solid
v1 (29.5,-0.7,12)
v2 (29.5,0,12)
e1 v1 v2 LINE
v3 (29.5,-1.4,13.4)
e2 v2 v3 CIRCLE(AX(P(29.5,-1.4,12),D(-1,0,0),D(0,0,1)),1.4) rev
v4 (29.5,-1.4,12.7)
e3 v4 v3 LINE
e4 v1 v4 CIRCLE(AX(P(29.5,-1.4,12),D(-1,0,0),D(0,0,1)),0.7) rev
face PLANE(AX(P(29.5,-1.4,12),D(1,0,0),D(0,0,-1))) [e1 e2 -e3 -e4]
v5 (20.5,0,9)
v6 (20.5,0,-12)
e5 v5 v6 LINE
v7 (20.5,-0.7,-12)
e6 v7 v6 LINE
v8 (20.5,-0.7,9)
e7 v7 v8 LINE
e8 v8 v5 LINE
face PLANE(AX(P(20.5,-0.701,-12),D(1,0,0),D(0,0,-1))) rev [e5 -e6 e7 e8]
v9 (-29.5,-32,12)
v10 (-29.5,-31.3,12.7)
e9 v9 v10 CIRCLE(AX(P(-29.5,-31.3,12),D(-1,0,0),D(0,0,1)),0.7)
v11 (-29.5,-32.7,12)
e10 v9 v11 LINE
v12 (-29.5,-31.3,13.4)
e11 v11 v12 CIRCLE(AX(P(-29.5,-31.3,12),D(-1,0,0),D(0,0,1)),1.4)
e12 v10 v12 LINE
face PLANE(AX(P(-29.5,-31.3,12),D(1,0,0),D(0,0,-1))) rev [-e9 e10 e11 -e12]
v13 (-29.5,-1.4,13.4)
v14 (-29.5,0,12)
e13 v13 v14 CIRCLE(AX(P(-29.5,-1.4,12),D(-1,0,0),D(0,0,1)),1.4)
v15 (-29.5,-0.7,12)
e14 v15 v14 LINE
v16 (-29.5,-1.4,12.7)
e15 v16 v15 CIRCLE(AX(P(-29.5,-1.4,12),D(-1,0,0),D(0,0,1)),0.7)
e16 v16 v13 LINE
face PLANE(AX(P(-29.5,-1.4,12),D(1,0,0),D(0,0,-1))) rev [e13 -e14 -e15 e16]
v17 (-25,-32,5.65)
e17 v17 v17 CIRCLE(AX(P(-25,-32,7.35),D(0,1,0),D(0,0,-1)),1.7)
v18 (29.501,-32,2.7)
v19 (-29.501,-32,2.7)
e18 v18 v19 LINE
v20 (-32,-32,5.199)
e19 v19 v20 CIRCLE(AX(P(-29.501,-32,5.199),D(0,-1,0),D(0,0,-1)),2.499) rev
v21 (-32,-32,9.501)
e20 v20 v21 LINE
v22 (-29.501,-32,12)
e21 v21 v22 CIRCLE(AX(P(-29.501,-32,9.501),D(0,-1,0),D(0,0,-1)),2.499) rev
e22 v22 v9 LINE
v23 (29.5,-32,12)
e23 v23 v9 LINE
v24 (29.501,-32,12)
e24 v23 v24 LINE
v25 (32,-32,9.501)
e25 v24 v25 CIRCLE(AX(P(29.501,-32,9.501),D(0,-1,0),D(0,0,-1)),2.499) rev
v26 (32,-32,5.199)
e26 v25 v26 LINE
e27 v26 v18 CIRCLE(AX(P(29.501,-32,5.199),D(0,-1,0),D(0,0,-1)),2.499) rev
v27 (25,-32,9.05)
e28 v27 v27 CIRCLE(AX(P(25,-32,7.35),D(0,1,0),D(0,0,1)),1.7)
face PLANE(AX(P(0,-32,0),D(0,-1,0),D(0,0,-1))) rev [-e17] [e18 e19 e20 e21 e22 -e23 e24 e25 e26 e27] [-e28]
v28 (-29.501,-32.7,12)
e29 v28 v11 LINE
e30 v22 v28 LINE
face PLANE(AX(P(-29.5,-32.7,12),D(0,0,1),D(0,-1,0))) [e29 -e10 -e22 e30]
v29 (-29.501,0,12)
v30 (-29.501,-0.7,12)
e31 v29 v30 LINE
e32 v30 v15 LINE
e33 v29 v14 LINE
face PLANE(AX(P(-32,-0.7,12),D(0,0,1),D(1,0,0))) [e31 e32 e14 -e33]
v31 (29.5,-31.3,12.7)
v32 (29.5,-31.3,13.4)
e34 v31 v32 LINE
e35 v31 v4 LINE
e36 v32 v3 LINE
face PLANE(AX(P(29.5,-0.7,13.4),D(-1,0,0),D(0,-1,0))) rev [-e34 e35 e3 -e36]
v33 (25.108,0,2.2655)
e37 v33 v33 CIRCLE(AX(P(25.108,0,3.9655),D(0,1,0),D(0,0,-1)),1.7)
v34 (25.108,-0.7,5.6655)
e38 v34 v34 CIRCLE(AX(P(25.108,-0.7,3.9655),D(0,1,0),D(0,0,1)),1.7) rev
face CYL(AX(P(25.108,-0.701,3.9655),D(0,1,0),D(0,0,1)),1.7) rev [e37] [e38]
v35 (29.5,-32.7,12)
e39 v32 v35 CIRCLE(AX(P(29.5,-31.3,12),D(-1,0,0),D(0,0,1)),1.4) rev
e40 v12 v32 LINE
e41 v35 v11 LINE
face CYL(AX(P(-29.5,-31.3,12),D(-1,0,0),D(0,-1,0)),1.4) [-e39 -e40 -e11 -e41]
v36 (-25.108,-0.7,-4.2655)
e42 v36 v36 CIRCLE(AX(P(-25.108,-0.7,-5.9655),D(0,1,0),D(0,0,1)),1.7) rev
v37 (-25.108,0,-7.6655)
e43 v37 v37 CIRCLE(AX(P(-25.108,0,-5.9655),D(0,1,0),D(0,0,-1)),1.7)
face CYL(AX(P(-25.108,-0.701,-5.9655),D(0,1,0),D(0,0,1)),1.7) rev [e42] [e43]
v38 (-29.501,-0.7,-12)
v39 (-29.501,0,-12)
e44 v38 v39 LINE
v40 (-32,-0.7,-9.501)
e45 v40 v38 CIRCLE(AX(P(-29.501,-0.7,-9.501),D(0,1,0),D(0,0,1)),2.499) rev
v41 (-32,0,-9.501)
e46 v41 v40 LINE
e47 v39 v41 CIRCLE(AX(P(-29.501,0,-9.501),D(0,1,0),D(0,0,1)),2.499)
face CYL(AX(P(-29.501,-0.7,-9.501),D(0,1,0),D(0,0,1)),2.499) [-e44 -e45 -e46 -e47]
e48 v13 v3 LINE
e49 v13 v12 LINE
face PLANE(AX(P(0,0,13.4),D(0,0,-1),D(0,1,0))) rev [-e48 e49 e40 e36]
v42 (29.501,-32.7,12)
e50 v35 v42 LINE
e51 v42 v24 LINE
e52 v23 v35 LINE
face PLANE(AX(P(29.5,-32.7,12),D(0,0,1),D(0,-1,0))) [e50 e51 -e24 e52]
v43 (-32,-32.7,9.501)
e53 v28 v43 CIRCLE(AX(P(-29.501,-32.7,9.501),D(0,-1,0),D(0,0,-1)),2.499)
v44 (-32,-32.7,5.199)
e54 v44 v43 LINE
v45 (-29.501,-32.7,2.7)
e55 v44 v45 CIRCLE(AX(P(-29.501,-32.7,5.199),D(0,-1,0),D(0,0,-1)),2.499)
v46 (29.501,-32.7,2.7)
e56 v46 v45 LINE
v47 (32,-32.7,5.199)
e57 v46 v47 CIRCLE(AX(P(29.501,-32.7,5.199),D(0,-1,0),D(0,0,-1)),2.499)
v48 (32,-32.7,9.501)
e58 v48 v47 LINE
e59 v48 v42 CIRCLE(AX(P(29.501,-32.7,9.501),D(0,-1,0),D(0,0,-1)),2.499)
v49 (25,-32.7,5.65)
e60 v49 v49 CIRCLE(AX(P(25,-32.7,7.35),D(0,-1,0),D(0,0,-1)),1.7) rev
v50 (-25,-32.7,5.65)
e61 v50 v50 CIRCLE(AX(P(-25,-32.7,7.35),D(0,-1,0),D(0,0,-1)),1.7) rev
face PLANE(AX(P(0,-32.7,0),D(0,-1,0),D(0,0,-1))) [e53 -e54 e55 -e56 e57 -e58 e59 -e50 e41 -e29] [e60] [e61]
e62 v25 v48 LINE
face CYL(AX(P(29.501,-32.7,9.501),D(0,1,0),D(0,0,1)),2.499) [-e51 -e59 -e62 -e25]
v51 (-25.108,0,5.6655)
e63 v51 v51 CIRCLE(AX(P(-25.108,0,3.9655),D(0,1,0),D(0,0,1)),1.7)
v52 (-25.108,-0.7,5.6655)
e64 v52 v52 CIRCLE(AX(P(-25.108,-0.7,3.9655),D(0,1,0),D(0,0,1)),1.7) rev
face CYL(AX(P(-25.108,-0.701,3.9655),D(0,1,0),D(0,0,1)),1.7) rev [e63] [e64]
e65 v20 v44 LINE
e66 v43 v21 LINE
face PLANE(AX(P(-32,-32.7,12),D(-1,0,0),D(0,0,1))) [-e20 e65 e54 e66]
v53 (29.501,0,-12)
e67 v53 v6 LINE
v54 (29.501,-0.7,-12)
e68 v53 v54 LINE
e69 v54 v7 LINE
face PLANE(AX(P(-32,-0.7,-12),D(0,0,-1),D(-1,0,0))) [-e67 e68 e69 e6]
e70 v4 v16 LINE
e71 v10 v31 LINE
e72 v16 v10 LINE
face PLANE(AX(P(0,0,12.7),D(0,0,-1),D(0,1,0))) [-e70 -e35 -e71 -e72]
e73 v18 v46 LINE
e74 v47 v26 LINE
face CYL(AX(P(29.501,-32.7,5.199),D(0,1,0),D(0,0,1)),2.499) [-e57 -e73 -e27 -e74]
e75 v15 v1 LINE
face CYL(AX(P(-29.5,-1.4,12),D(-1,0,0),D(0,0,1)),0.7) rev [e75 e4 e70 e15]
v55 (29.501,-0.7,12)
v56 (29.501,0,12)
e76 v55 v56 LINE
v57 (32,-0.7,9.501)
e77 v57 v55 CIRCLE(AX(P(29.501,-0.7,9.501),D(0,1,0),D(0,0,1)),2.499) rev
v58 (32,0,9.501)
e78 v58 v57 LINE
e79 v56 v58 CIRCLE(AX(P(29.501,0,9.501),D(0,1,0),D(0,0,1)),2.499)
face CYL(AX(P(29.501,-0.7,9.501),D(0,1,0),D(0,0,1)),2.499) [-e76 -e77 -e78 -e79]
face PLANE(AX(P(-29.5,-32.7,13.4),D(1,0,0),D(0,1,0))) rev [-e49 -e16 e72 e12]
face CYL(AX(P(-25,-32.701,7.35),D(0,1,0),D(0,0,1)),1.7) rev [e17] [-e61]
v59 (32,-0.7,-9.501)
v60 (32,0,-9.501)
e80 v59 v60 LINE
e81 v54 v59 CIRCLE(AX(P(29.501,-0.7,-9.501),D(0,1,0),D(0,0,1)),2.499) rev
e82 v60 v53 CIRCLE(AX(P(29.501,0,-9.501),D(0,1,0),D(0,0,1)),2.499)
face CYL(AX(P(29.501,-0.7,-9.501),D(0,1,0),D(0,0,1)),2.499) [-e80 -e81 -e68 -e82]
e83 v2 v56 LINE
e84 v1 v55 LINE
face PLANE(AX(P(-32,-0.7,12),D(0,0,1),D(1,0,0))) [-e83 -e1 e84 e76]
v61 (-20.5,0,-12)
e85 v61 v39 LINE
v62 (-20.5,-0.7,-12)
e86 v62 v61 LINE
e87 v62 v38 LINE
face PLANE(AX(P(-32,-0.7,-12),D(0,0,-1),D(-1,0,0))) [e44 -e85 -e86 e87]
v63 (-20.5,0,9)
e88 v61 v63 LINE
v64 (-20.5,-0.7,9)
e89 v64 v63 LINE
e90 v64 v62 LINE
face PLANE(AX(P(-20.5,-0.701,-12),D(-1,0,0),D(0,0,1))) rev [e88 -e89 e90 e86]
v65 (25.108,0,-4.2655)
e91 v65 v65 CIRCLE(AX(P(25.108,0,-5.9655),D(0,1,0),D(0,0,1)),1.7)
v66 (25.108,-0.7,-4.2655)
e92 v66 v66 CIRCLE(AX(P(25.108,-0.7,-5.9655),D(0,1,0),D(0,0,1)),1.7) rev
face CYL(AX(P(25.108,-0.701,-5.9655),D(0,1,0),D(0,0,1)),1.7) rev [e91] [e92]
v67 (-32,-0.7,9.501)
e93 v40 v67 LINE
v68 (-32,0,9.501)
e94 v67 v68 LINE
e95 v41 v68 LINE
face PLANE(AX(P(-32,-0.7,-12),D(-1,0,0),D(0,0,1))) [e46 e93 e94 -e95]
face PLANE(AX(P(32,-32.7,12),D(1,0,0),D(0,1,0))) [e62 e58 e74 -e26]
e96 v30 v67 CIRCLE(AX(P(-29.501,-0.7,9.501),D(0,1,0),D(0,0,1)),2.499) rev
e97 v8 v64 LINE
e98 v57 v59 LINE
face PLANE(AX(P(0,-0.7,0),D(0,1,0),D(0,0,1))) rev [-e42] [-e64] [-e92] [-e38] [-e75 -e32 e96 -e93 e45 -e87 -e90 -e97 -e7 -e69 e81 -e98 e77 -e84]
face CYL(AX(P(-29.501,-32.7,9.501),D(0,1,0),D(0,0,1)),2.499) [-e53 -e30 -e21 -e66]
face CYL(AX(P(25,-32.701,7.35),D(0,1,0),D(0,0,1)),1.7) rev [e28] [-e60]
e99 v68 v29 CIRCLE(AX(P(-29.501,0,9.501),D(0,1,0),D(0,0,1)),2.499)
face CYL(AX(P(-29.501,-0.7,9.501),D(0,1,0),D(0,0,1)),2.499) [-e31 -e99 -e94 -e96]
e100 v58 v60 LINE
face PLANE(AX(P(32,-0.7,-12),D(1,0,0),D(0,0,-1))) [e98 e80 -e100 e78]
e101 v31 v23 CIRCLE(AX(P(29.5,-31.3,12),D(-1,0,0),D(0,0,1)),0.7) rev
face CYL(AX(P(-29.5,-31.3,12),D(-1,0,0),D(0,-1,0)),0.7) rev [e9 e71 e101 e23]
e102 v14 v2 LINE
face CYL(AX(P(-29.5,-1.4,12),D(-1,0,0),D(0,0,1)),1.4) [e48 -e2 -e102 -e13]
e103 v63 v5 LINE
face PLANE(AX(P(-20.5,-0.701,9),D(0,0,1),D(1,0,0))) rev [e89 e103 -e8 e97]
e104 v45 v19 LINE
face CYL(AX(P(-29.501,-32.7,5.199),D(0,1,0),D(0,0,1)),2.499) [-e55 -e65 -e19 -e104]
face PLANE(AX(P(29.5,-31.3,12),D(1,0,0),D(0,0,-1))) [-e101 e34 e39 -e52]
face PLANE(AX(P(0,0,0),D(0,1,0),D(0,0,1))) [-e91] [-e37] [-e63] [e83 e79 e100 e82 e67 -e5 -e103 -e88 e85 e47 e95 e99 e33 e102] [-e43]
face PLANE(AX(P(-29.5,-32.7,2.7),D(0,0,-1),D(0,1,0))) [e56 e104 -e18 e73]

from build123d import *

# Parameters (mm, degrees)
SKETCH4_W                    = 64
SKETCH4_H                    = 24
BASE_FLANGE2_DEPTH           = 0.7
CUT_EXTRUDE1_REACH           = 36.183
SKETCH7_W                    = 41
SKETCH7_H                    = 21
CUT_EXTRUDE2_REACH           = 36.183
SKETCH8_R                    = 1.7
EDGE_FLANGE1_DEPTH           = 59
EDGE_FLANGE2_STRIP_W         = 4.2
EDGE_FLANGE2_STRIP_H         = 0.7
EDGE_FLANGE2_STRIP_CUT_DEPTH = 59
EDGE_FLANGE2_DEPTH           = 59
SKETCH16_W                   = 2.5
SKETCH16_H                   = 9.3
TAB1_DEPTH                   = 0.7
CUT_EXTRUDE3_REACH           = 49.197
SKETCH15_R                   = 1.7
BREAK_CORNER1_START          = -32.7
BREAK_CORNER1_DEPTH          = 32.7
BREAK_CORNER1_2_DEPTH        = 0.7


# Read off the part's stored shape, not the designer's step: Break-Corner1
# Sheet-metal steps are written as plain solids
with BuildPart() as part:
    # Sketch4 → Base-Flange2 (new body)
    with BuildSketch(Plane(origin=(0, 0, 0), x_dir=(1, 0, 0), z_dir=(0, 1, 0))):
        Rectangle(SKETCH4_W, SKETCH4_H)
    extrude(amount=-BASE_FLANGE2_DEPTH)

    # Sketch7 → Cut-Extrude1 (cut, up to next)
    with BuildSketch(Plane(origin=(0, 0, 0), x_dir=(1, 0, 0), z_dir=(0, 1, 0)), mode=Mode.PRIVATE) as cut_extrude1_sk1:
        with Locations((0, 1.5)):
            Rectangle(SKETCH7_W, SKETCH7_H)
    cut_extrude1_tool1 = extrude(cut_extrude1_sk1.sketch, amount=-CUT_EXTRUDE1_REACH, mode=Mode.PRIVATE) & part.part
    add(cut_extrude1_tool1.solids().sort_by_distance((0, 0, -1.5))[0], mode=Mode.SUBTRACT)

    # Sketch8 → Cut-Extrude2 (cut, up to next)
    with BuildSketch(Plane(origin=(0, 0, 0), x_dir=(1, 0, 0), z_dir=(0, 1, 0)), mode=Mode.PRIVATE) as cut_extrude2_sk1:
        with Locations(Location((-25.108, -3.9655, 0), (0, 0, 270))):
            Circle(SKETCH8_R)
    cut_extrude2_tool1 = extrude(cut_extrude2_sk1.sketch, amount=-CUT_EXTRUDE2_REACH, mode=Mode.PRIVATE) & part.part
    # Sketch8 → Cut-Extrude2 (cut, up to next)
    with BuildSketch(Plane(origin=(0, 0, 0), x_dir=(1, 0, 0), z_dir=(0, 1, 0)), mode=Mode.PRIVATE) as cut_extrude2_sk2:
        with Locations(Location((-25.108, 5.9655, 0), (0, 0, 270))):
            Circle(SKETCH8_R)
    cut_extrude2_tool2 = extrude(cut_extrude2_sk2.sketch, amount=-CUT_EXTRUDE2_REACH, mode=Mode.PRIVATE) & part.part
    # Sketch8 → Cut-Extrude2 (cut, up to next)
    with BuildSketch(Plane(origin=(0, 0, 0), x_dir=(1, 0, 0), z_dir=(0, 1, 0)), mode=Mode.PRIVATE) as cut_extrude2_sk3:
        with Locations(Location((25.108, -3.9655, 0), (0, 0, 270))):
            Circle(SKETCH8_R)
    cut_extrude2_tool3 = extrude(cut_extrude2_sk3.sketch, amount=-CUT_EXTRUDE2_REACH, mode=Mode.PRIVATE) & part.part
    # Sketch8 → Cut-Extrude2 (cut, up to next)
    with BuildSketch(Plane(origin=(0, 0, 0), x_dir=(1, 0, 0), z_dir=(0, 1, 0)), mode=Mode.PRIVATE) as cut_extrude2_sk4:
        with Locations(Location((25.108, 5.9655, 0), (0, 0, 270))):
            Circle(SKETCH8_R)
    cut_extrude2_tool4 = extrude(cut_extrude2_sk4.sketch, amount=-CUT_EXTRUDE2_REACH, mode=Mode.PRIVATE) & part.part
    add(cut_extrude2_tool1.solids().sort_by_distance((-25.108, 0, 3.9655))[0], mode=Mode.SUBTRACT)
    add(cut_extrude2_tool2.solids().sort_by_distance((-25.108, 0, -5.9655))[0], mode=Mode.SUBTRACT)
    add(cut_extrude2_tool3.solids().sort_by_distance((25.108, 0, 3.9655))[0], mode=Mode.SUBTRACT)
    add(cut_extrude2_tool4.solids().sort_by_distance((25.108, 0, -5.9655))[0], mode=Mode.SUBTRACT)

    # Edge-Flange1 section (across the edge) → Edge-Flange1 (add)
    with BuildSketch(Plane(origin=(29.5, -0.7, 12.7), x_dir=(0, 0, -1), z_dir=(-1, 0, 0))):
        with BuildLine():
            Line((-0.7, 0.7), (-0.7, 32))
            Line((-0.7, 32), (0, 32))
            Line((0, 32), (0, 0.7))
            ThreePointArc((0, 0.7), (0.205025253, 0.205025253), (0.7, 0))
            Line((0.7, 0), (0.7, -0.7))
            ThreePointArc((0.7, -0.7), (-0.289949494, -0.289949494), (-0.7, 0.7))
        make_face()
    extrude(amount=EDGE_FLANGE1_DEPTH)

    # Edge-Flange2 strip (across the edge) → Edge-Flange2 strip cut (cut)
    with BuildSketch(Plane(origin=(29.5, -32.7, 12.7), x_dir=(0, 1, 0), z_dir=(-1, 0, 0))):
        with Locations((-0.7, -0.35)):
            Rectangle(EDGE_FLANGE2_STRIP_W, EDGE_FLANGE2_STRIP_H)
    extrude(amount=EDGE_FLANGE2_STRIP_CUT_DEPTH, mode=Mode.SUBTRACT)

    # Edge-Flange2 section (across the edge) → Edge-Flange2 (add)
    with BuildSketch(Plane(origin=(29.5, -32.7, 12.7), x_dir=(0, 1, 0), z_dir=(-1, 0, 0))):
        with BuildLine():
            Line((0, 0.7), (0, 10))
            Line((0, 10), (0.7, 10))
            Line((0.7, 10), (0.7, 0.7))
            ThreePointArc((0.7, 0.7), (0.905025253, 0.205025253), (1.4, 0))
            Line((1.4, 0), (1.4, -0.7))
            ThreePointArc((1.4, -0.7), (0.410050506, -0.289949494), (0, 0.7))
        make_face()
    extrude(amount=EDGE_FLANGE2_DEPTH)

    # Sketch16 → Tab1 (add)
    with BuildSketch(Plane(origin=(0, -32, 0), x_dir=(1, 0, 0), z_dir=(0, 1, 0))):
        with Locations((-30.75, -7.35)):
            Rectangle(SKETCH16_W, SKETCH16_H)
        with Locations((30.75, -7.35)):
            Rectangle(SKETCH16_W, SKETCH16_H)
    extrude(amount=-TAB1_DEPTH)

    # Sketch15 → Cut-Extrude3 (cut, up to next)
    with BuildSketch(Plane(origin=(0, -32, 0), x_dir=(1, 0, 0), z_dir=(0, 1, 0)), mode=Mode.PRIVATE) as cut_extrude3_sk1:
        with Locations(Location((25, -7.35, 0), (0, 0, 270))):
            Circle(SKETCH15_R)
    cut_extrude3_tool1 = extrude(cut_extrude3_sk1.sketch, amount=-CUT_EXTRUDE3_REACH, mode=Mode.PRIVATE) & part.part
    # Sketch15 → Cut-Extrude3 (cut, up to next)
    with BuildSketch(Plane(origin=(0, -32, 0), x_dir=(1, 0, 0), z_dir=(0, 1, 0)), mode=Mode.PRIVATE) as cut_extrude3_sk2:
        with Locations(Location((-25, -7.35, 0), (0, 0, 90))):
            Circle(SKETCH15_R)
    cut_extrude3_tool2 = extrude(cut_extrude3_sk2.sketch, amount=-CUT_EXTRUDE3_REACH, mode=Mode.PRIVATE) & part.part
    add(cut_extrude3_tool1.solids().sort_by_distance((25, -32, 7.35))[0], mode=Mode.SUBTRACT)
    add(cut_extrude3_tool2.solids().sort_by_distance((-25, -32, 7.35))[0], mode=Mode.SUBTRACT)

    # Break-Corner1 outline → Break-Corner1 (cut)
    with BuildSketch(Plane(origin=(0, 0, 0), x_dir=(1, 0, 0), z_dir=(0, 1, 0)).offset(BREAK_CORNER1_START)):
        with BuildLine():
            Line((-32, 12), (-32, 9.501))
            ThreePointArc((-32, 9.501), (-31.268059846, 11.268059846), (-29.501, 12))
            Line((-29.501, 12), (-32, 12))
        make_face()
        with BuildLine():
            ThreePointArc((29.501, 12), (31.268059846, 11.268059846), (32, 9.501))
            Line((32, 9.501), (32, 12))
            Line((32, 12), (29.501, 12))
        make_face()
        with BuildLine():
            Line((32, -12), (32, -9.501))
            ThreePointArc((32, -9.501), (31.268059846, -11.268059846), (29.501, -12))
            Line((29.501, -12), (32, -12))
        make_face()
        with BuildLine():
            ThreePointArc((-29.501, -12), (-31.268059846, -11.268059846), (-32, -9.501))
            Line((-32, -9.501), (-32, -12))
            Line((-32, -12), (-29.501, -12))
        make_face()
    extrude(amount=BREAK_CORNER1_DEPTH, mode=Mode.SUBTRACT)

    # Break-Corner1 2 outline → Break-Corner1 2 (cut)
    with BuildSketch(Plane(origin=(0, 0, 0), x_dir=(1, 0, 0), z_dir=(0, 1, 0)).offset(BREAK_CORNER1_START)):
        with BuildLine():
            Line((32, -2.7), (29.501, -2.7))
            ThreePointArc((29.501, -2.7), (31.268059846, -3.431940154), (32, -5.199))
            Line((32, -5.199), (32, -2.7))
        make_face()
        with BuildLine():
            Line((-32, -2.7), (-32, -5.199))
            ThreePointArc((-32, -5.199), (-31.268059846, -3.431940154), (-29.501, -2.7))
            Line((-29.501, -2.7), (-32, -2.7))
        make_face()
    extrude(amount=BREAK_CORNER1_2_DEPTH, mode=Mode.SUBTRACT)


solid = part.part
